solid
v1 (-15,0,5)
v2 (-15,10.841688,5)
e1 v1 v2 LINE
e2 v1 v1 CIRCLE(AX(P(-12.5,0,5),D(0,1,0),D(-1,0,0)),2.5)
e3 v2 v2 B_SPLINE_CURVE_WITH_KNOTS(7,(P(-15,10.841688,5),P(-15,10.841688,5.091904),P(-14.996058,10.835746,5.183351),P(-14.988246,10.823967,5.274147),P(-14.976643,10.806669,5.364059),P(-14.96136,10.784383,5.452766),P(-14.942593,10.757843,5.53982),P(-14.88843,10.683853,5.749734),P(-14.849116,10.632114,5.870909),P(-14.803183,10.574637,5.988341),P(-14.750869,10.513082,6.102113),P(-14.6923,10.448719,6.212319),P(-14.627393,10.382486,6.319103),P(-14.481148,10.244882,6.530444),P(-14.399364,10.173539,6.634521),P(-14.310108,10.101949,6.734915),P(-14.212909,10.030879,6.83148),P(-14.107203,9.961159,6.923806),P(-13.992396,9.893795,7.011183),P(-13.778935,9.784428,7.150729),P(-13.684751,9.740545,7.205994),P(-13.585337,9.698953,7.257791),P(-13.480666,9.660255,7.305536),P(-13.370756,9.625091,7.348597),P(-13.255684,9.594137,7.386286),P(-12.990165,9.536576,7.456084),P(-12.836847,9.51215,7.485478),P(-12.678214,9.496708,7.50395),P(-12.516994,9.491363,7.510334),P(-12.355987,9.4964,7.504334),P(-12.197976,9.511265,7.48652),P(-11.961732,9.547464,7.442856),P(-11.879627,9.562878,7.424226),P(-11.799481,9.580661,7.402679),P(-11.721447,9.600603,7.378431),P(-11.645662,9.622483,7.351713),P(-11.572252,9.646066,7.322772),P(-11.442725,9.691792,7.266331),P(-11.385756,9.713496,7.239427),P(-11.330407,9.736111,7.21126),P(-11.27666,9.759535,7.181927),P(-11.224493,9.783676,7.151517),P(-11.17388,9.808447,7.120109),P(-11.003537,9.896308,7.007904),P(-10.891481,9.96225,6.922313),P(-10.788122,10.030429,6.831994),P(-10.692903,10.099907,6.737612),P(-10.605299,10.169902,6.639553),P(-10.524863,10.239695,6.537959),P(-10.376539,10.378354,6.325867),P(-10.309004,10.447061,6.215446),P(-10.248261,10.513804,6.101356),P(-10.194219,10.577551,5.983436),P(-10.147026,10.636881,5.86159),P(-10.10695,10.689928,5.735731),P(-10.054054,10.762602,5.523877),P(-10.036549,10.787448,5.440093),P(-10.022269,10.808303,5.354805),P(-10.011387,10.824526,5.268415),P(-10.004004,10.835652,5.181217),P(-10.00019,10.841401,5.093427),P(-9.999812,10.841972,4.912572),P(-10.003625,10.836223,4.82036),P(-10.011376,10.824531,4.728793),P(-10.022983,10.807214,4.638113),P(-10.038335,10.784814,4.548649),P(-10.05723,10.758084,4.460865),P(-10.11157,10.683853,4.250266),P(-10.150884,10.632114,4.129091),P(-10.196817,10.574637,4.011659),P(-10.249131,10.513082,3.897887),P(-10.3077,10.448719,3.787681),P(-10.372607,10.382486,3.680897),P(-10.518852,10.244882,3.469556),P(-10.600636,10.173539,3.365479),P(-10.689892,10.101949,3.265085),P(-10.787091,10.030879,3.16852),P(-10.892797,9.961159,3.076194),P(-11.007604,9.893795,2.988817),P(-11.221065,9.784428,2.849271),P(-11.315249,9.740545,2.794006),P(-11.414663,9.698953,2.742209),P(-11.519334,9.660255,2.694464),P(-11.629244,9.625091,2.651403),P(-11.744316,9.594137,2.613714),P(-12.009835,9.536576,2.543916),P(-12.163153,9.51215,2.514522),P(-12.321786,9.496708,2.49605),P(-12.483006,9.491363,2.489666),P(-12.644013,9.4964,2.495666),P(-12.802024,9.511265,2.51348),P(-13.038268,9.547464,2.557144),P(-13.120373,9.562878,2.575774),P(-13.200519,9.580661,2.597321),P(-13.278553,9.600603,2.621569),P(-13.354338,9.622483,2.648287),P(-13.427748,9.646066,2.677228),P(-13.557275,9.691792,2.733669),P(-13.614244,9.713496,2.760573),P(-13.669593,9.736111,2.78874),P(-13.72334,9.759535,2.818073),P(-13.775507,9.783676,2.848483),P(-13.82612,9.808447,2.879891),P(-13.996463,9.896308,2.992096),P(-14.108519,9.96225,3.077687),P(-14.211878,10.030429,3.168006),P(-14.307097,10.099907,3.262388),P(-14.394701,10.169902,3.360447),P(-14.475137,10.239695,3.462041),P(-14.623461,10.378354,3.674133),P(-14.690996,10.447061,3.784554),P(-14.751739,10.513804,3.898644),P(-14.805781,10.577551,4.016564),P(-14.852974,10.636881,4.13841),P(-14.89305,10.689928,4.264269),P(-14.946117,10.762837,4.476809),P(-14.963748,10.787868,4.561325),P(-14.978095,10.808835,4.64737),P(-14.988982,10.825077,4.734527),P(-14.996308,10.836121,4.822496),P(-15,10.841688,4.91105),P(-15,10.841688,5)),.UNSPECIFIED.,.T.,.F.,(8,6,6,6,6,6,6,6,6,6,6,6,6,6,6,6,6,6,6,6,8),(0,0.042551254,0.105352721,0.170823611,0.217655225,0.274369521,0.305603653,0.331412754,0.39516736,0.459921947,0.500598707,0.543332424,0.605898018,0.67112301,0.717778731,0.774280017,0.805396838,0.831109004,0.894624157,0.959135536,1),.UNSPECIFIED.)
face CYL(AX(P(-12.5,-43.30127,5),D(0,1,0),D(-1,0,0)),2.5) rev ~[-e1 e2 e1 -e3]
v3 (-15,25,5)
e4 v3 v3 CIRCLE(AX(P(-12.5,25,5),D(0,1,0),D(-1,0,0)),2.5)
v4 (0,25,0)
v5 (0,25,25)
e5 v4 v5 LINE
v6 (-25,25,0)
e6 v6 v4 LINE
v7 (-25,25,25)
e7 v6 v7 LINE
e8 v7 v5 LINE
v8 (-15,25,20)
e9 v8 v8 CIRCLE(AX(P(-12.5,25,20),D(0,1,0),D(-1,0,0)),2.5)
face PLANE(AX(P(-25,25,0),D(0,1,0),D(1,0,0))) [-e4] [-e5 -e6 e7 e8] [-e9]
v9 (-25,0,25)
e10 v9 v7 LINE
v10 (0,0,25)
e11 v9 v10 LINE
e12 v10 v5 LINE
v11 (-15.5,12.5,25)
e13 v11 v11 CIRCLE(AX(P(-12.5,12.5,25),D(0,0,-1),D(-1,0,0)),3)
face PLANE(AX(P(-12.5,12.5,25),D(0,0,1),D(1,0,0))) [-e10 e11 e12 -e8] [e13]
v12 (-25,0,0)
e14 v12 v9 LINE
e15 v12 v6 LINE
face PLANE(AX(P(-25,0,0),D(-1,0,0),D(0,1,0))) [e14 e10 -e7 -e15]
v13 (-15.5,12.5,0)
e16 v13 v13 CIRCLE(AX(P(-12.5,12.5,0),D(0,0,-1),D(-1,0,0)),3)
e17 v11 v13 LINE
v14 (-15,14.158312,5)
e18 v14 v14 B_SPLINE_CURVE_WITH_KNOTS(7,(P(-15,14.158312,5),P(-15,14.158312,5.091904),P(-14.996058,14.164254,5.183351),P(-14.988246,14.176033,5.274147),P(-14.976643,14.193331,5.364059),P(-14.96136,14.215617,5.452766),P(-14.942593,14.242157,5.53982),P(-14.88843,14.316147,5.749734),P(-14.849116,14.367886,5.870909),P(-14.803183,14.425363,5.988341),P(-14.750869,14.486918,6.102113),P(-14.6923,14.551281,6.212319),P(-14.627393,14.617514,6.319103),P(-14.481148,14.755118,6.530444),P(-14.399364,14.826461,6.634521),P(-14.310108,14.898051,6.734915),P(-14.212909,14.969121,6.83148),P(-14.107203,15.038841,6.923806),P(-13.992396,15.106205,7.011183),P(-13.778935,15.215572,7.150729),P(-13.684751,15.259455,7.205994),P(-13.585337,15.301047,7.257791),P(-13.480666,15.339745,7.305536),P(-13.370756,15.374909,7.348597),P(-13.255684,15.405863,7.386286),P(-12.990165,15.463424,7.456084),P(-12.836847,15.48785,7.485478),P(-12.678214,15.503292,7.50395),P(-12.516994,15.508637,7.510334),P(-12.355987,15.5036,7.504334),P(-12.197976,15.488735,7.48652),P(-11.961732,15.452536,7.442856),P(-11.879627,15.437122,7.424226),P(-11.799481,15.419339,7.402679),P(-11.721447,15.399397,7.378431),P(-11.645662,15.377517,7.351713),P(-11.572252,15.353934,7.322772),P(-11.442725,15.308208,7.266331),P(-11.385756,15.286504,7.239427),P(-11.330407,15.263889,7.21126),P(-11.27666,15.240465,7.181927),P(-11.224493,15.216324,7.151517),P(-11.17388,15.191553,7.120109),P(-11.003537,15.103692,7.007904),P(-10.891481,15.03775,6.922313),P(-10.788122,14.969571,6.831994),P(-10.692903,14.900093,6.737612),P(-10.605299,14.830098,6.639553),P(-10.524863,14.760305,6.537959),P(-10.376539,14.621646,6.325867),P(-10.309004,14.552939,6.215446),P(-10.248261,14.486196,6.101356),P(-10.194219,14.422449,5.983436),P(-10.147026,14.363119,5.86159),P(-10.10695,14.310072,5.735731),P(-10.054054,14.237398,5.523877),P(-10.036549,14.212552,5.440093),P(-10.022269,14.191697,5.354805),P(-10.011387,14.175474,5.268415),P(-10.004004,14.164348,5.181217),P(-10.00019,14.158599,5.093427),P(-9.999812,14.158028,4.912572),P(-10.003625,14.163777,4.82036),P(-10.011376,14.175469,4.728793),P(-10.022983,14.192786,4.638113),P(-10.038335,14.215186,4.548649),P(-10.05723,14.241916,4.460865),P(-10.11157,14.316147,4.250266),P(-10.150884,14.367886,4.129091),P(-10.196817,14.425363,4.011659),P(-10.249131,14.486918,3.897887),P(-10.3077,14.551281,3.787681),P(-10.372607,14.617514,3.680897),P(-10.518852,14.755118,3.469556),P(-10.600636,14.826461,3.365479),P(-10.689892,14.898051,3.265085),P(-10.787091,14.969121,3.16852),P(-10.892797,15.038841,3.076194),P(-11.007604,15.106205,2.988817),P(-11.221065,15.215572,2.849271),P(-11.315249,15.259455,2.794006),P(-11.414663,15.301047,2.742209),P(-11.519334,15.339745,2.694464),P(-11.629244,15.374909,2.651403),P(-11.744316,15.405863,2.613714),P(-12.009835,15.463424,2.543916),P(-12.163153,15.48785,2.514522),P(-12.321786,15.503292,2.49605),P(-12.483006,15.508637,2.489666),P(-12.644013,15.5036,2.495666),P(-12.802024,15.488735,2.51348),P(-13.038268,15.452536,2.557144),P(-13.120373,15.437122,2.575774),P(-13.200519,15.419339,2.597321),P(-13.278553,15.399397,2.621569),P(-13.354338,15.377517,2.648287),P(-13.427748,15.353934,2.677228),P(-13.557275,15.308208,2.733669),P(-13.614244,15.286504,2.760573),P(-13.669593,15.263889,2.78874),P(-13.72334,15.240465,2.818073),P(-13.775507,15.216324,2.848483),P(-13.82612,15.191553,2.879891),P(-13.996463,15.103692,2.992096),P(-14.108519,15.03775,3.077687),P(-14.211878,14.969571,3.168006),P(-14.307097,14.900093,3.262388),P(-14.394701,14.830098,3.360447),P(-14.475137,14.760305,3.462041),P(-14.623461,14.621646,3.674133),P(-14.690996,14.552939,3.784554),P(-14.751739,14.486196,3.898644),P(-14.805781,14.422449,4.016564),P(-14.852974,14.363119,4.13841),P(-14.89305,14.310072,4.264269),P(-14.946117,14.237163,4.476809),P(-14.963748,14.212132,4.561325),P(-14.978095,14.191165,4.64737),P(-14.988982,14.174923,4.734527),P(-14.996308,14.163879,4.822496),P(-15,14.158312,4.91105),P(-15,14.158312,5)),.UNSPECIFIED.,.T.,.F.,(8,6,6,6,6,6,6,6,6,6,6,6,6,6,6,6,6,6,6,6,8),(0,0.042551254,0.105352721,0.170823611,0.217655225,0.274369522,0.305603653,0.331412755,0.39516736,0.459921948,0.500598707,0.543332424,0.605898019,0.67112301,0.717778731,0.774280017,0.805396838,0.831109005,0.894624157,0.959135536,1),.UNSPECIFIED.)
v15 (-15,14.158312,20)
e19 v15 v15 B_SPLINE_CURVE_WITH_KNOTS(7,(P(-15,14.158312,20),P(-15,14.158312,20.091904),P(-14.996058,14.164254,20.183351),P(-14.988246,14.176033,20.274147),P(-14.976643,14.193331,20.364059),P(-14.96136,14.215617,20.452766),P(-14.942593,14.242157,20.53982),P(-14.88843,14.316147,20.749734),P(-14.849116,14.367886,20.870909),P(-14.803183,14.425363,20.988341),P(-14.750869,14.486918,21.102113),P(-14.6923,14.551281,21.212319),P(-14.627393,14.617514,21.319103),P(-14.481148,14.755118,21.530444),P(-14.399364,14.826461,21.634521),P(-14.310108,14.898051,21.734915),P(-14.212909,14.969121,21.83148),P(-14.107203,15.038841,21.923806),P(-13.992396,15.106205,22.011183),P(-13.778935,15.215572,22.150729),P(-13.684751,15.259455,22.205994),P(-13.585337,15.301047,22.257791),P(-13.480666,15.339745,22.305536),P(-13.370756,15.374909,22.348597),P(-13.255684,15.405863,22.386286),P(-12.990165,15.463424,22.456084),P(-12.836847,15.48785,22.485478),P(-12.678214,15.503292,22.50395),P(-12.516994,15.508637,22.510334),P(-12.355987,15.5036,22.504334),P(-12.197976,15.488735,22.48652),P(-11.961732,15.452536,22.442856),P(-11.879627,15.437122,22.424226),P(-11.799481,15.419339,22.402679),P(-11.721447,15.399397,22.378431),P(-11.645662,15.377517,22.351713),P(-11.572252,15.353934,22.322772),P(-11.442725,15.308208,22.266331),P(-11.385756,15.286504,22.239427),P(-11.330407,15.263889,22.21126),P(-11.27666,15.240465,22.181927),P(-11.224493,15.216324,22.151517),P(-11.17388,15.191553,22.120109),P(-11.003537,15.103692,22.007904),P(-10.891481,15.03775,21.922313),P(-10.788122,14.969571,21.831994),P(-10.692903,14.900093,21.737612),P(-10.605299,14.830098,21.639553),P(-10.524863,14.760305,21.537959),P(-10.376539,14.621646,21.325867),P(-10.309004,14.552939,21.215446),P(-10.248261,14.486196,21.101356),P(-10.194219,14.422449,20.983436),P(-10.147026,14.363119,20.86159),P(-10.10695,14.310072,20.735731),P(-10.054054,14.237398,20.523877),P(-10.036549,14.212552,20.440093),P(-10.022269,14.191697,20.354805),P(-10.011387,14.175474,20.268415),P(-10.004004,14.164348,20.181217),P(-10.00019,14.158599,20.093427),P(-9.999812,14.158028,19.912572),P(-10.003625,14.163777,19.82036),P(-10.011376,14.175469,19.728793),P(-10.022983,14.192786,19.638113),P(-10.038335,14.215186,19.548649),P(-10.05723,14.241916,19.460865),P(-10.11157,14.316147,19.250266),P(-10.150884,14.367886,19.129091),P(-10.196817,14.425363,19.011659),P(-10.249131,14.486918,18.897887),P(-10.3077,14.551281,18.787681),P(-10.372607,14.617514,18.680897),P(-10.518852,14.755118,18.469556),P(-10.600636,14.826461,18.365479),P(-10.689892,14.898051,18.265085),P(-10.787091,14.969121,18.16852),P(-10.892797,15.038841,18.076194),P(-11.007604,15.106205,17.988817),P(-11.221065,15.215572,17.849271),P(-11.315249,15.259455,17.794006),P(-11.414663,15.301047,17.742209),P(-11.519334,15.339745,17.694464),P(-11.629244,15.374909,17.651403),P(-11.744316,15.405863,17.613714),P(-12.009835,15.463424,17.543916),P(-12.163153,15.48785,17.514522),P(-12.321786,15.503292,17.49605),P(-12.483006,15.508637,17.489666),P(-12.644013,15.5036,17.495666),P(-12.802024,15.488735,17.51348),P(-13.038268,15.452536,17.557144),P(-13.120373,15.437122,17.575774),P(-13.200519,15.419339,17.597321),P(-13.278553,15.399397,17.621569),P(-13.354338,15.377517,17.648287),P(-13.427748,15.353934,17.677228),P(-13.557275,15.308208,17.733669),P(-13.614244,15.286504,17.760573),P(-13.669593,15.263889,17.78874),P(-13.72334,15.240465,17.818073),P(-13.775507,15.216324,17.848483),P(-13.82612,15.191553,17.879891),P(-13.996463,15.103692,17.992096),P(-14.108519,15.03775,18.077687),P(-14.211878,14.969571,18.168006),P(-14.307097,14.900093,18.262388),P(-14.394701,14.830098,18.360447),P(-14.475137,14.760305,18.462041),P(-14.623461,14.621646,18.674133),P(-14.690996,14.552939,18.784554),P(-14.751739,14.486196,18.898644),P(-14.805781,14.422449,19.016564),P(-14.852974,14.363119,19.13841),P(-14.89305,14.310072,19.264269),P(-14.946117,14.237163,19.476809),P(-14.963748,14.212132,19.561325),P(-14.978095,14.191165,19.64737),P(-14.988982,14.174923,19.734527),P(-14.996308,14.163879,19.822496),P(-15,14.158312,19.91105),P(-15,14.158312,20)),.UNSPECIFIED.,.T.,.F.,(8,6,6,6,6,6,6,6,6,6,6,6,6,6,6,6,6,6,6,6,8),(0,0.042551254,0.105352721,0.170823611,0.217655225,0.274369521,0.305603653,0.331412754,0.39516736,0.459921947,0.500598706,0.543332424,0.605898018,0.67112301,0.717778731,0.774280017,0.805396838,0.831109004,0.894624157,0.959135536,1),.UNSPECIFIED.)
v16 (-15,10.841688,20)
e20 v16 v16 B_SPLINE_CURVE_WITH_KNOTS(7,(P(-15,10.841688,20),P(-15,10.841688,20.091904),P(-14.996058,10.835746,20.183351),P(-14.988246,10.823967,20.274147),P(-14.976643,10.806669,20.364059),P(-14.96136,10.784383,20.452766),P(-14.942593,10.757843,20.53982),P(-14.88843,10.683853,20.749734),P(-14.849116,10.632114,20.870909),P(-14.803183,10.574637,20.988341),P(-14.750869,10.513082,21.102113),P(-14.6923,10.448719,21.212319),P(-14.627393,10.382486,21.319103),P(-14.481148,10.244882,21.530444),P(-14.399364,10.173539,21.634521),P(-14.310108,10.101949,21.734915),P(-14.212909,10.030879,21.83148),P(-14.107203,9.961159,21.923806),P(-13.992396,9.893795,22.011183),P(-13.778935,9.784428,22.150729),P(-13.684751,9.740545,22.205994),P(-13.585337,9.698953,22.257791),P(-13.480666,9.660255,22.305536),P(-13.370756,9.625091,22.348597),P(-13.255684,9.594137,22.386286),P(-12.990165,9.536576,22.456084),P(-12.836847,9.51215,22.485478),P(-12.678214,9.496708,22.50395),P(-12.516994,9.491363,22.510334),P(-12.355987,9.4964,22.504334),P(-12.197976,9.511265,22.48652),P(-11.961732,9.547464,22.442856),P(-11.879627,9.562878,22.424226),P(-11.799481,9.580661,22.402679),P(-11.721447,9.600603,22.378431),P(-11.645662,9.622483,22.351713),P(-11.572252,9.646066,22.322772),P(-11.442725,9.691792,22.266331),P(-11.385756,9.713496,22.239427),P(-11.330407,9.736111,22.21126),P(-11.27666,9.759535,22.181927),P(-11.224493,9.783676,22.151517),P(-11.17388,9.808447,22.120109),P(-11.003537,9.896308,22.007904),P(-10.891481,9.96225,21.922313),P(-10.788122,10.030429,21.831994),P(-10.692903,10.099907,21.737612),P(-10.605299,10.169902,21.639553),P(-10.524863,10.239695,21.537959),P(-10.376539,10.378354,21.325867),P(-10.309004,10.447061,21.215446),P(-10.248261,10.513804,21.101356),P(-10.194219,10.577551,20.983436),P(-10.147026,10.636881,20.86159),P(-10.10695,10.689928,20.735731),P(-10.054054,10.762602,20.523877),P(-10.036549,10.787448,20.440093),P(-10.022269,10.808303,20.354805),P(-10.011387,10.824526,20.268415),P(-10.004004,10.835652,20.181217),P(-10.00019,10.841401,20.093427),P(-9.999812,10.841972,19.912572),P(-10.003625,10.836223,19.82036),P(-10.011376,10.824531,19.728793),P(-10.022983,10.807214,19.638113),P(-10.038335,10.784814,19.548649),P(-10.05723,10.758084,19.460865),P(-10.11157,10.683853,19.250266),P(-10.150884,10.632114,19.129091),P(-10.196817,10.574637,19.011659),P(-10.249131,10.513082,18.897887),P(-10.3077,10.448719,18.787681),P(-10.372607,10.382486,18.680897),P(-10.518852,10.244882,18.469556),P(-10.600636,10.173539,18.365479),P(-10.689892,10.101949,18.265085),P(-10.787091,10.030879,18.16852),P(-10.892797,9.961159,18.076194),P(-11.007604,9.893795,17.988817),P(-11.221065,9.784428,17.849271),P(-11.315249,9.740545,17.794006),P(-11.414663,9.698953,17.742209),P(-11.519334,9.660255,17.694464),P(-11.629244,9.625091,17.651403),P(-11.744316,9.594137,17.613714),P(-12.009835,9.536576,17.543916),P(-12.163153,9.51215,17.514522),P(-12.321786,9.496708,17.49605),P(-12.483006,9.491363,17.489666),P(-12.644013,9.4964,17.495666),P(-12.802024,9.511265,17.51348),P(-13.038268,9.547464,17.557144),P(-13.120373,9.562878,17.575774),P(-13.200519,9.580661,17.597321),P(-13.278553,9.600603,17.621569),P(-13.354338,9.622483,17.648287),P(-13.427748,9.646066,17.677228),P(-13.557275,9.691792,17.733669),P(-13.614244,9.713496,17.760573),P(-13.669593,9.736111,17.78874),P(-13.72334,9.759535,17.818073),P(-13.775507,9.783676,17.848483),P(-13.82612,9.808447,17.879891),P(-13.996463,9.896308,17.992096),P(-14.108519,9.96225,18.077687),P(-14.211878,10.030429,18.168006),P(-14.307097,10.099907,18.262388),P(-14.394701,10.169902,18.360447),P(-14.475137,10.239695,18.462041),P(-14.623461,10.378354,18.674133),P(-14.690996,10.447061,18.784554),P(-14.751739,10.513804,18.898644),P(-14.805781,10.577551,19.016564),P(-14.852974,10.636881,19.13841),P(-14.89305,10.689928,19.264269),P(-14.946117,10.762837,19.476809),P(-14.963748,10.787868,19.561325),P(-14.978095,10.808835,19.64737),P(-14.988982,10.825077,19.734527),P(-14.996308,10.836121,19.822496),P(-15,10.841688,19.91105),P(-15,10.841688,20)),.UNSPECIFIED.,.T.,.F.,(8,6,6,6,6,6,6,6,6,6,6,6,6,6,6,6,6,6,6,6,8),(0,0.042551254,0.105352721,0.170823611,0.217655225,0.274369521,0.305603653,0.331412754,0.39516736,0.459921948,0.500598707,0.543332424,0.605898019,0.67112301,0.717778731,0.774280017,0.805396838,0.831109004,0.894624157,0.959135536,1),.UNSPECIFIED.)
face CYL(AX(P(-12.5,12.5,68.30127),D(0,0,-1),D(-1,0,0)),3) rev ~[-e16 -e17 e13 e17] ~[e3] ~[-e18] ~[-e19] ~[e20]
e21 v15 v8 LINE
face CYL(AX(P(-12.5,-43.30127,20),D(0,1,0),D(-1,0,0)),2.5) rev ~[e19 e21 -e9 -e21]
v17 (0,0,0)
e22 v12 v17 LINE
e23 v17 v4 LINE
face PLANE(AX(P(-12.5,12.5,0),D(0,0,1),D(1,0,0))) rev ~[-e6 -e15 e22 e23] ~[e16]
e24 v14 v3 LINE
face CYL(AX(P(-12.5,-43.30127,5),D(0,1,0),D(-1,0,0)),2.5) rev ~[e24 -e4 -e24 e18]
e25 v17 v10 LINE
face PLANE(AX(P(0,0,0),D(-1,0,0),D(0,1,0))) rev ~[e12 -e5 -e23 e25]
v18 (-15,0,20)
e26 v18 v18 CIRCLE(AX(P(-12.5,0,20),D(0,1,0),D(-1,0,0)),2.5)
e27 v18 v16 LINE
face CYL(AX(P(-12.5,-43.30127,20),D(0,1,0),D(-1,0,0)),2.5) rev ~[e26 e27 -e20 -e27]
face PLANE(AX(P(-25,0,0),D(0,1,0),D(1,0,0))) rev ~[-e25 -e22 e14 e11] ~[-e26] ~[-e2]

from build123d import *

# Parameters (mm, degrees)
F0_W     = 25
F0_H     = 25
F1_DEPTH = 25
F3_D     = 6
F5_D     = 5
F7_D     = 5


with BuildPart() as f1:
    # F0 (on Top) → F1 (new body)
    with BuildSketch(Plane.XY):
        with Locations((-12.5, 12.5)):
            Rectangle(F0_W, F0_H)
    extrude(amount=F1_DEPTH)

    # F3 (through all)
    with Locations(Plane.XY.offset(25)):
        with Locations((-12.5, 12.5)):
            Hole(F3_D / 2)

    # F5 (through all)
    with Locations(Plane.XZ):
        with Locations((-12.5, 20)):
            Hole(F5_D / 2)

    # F7 (through all)
    with Locations(Plane.XZ):
        with Locations((-12.5, 5)):
            Hole(F7_D / 2)


solid = f1.part
